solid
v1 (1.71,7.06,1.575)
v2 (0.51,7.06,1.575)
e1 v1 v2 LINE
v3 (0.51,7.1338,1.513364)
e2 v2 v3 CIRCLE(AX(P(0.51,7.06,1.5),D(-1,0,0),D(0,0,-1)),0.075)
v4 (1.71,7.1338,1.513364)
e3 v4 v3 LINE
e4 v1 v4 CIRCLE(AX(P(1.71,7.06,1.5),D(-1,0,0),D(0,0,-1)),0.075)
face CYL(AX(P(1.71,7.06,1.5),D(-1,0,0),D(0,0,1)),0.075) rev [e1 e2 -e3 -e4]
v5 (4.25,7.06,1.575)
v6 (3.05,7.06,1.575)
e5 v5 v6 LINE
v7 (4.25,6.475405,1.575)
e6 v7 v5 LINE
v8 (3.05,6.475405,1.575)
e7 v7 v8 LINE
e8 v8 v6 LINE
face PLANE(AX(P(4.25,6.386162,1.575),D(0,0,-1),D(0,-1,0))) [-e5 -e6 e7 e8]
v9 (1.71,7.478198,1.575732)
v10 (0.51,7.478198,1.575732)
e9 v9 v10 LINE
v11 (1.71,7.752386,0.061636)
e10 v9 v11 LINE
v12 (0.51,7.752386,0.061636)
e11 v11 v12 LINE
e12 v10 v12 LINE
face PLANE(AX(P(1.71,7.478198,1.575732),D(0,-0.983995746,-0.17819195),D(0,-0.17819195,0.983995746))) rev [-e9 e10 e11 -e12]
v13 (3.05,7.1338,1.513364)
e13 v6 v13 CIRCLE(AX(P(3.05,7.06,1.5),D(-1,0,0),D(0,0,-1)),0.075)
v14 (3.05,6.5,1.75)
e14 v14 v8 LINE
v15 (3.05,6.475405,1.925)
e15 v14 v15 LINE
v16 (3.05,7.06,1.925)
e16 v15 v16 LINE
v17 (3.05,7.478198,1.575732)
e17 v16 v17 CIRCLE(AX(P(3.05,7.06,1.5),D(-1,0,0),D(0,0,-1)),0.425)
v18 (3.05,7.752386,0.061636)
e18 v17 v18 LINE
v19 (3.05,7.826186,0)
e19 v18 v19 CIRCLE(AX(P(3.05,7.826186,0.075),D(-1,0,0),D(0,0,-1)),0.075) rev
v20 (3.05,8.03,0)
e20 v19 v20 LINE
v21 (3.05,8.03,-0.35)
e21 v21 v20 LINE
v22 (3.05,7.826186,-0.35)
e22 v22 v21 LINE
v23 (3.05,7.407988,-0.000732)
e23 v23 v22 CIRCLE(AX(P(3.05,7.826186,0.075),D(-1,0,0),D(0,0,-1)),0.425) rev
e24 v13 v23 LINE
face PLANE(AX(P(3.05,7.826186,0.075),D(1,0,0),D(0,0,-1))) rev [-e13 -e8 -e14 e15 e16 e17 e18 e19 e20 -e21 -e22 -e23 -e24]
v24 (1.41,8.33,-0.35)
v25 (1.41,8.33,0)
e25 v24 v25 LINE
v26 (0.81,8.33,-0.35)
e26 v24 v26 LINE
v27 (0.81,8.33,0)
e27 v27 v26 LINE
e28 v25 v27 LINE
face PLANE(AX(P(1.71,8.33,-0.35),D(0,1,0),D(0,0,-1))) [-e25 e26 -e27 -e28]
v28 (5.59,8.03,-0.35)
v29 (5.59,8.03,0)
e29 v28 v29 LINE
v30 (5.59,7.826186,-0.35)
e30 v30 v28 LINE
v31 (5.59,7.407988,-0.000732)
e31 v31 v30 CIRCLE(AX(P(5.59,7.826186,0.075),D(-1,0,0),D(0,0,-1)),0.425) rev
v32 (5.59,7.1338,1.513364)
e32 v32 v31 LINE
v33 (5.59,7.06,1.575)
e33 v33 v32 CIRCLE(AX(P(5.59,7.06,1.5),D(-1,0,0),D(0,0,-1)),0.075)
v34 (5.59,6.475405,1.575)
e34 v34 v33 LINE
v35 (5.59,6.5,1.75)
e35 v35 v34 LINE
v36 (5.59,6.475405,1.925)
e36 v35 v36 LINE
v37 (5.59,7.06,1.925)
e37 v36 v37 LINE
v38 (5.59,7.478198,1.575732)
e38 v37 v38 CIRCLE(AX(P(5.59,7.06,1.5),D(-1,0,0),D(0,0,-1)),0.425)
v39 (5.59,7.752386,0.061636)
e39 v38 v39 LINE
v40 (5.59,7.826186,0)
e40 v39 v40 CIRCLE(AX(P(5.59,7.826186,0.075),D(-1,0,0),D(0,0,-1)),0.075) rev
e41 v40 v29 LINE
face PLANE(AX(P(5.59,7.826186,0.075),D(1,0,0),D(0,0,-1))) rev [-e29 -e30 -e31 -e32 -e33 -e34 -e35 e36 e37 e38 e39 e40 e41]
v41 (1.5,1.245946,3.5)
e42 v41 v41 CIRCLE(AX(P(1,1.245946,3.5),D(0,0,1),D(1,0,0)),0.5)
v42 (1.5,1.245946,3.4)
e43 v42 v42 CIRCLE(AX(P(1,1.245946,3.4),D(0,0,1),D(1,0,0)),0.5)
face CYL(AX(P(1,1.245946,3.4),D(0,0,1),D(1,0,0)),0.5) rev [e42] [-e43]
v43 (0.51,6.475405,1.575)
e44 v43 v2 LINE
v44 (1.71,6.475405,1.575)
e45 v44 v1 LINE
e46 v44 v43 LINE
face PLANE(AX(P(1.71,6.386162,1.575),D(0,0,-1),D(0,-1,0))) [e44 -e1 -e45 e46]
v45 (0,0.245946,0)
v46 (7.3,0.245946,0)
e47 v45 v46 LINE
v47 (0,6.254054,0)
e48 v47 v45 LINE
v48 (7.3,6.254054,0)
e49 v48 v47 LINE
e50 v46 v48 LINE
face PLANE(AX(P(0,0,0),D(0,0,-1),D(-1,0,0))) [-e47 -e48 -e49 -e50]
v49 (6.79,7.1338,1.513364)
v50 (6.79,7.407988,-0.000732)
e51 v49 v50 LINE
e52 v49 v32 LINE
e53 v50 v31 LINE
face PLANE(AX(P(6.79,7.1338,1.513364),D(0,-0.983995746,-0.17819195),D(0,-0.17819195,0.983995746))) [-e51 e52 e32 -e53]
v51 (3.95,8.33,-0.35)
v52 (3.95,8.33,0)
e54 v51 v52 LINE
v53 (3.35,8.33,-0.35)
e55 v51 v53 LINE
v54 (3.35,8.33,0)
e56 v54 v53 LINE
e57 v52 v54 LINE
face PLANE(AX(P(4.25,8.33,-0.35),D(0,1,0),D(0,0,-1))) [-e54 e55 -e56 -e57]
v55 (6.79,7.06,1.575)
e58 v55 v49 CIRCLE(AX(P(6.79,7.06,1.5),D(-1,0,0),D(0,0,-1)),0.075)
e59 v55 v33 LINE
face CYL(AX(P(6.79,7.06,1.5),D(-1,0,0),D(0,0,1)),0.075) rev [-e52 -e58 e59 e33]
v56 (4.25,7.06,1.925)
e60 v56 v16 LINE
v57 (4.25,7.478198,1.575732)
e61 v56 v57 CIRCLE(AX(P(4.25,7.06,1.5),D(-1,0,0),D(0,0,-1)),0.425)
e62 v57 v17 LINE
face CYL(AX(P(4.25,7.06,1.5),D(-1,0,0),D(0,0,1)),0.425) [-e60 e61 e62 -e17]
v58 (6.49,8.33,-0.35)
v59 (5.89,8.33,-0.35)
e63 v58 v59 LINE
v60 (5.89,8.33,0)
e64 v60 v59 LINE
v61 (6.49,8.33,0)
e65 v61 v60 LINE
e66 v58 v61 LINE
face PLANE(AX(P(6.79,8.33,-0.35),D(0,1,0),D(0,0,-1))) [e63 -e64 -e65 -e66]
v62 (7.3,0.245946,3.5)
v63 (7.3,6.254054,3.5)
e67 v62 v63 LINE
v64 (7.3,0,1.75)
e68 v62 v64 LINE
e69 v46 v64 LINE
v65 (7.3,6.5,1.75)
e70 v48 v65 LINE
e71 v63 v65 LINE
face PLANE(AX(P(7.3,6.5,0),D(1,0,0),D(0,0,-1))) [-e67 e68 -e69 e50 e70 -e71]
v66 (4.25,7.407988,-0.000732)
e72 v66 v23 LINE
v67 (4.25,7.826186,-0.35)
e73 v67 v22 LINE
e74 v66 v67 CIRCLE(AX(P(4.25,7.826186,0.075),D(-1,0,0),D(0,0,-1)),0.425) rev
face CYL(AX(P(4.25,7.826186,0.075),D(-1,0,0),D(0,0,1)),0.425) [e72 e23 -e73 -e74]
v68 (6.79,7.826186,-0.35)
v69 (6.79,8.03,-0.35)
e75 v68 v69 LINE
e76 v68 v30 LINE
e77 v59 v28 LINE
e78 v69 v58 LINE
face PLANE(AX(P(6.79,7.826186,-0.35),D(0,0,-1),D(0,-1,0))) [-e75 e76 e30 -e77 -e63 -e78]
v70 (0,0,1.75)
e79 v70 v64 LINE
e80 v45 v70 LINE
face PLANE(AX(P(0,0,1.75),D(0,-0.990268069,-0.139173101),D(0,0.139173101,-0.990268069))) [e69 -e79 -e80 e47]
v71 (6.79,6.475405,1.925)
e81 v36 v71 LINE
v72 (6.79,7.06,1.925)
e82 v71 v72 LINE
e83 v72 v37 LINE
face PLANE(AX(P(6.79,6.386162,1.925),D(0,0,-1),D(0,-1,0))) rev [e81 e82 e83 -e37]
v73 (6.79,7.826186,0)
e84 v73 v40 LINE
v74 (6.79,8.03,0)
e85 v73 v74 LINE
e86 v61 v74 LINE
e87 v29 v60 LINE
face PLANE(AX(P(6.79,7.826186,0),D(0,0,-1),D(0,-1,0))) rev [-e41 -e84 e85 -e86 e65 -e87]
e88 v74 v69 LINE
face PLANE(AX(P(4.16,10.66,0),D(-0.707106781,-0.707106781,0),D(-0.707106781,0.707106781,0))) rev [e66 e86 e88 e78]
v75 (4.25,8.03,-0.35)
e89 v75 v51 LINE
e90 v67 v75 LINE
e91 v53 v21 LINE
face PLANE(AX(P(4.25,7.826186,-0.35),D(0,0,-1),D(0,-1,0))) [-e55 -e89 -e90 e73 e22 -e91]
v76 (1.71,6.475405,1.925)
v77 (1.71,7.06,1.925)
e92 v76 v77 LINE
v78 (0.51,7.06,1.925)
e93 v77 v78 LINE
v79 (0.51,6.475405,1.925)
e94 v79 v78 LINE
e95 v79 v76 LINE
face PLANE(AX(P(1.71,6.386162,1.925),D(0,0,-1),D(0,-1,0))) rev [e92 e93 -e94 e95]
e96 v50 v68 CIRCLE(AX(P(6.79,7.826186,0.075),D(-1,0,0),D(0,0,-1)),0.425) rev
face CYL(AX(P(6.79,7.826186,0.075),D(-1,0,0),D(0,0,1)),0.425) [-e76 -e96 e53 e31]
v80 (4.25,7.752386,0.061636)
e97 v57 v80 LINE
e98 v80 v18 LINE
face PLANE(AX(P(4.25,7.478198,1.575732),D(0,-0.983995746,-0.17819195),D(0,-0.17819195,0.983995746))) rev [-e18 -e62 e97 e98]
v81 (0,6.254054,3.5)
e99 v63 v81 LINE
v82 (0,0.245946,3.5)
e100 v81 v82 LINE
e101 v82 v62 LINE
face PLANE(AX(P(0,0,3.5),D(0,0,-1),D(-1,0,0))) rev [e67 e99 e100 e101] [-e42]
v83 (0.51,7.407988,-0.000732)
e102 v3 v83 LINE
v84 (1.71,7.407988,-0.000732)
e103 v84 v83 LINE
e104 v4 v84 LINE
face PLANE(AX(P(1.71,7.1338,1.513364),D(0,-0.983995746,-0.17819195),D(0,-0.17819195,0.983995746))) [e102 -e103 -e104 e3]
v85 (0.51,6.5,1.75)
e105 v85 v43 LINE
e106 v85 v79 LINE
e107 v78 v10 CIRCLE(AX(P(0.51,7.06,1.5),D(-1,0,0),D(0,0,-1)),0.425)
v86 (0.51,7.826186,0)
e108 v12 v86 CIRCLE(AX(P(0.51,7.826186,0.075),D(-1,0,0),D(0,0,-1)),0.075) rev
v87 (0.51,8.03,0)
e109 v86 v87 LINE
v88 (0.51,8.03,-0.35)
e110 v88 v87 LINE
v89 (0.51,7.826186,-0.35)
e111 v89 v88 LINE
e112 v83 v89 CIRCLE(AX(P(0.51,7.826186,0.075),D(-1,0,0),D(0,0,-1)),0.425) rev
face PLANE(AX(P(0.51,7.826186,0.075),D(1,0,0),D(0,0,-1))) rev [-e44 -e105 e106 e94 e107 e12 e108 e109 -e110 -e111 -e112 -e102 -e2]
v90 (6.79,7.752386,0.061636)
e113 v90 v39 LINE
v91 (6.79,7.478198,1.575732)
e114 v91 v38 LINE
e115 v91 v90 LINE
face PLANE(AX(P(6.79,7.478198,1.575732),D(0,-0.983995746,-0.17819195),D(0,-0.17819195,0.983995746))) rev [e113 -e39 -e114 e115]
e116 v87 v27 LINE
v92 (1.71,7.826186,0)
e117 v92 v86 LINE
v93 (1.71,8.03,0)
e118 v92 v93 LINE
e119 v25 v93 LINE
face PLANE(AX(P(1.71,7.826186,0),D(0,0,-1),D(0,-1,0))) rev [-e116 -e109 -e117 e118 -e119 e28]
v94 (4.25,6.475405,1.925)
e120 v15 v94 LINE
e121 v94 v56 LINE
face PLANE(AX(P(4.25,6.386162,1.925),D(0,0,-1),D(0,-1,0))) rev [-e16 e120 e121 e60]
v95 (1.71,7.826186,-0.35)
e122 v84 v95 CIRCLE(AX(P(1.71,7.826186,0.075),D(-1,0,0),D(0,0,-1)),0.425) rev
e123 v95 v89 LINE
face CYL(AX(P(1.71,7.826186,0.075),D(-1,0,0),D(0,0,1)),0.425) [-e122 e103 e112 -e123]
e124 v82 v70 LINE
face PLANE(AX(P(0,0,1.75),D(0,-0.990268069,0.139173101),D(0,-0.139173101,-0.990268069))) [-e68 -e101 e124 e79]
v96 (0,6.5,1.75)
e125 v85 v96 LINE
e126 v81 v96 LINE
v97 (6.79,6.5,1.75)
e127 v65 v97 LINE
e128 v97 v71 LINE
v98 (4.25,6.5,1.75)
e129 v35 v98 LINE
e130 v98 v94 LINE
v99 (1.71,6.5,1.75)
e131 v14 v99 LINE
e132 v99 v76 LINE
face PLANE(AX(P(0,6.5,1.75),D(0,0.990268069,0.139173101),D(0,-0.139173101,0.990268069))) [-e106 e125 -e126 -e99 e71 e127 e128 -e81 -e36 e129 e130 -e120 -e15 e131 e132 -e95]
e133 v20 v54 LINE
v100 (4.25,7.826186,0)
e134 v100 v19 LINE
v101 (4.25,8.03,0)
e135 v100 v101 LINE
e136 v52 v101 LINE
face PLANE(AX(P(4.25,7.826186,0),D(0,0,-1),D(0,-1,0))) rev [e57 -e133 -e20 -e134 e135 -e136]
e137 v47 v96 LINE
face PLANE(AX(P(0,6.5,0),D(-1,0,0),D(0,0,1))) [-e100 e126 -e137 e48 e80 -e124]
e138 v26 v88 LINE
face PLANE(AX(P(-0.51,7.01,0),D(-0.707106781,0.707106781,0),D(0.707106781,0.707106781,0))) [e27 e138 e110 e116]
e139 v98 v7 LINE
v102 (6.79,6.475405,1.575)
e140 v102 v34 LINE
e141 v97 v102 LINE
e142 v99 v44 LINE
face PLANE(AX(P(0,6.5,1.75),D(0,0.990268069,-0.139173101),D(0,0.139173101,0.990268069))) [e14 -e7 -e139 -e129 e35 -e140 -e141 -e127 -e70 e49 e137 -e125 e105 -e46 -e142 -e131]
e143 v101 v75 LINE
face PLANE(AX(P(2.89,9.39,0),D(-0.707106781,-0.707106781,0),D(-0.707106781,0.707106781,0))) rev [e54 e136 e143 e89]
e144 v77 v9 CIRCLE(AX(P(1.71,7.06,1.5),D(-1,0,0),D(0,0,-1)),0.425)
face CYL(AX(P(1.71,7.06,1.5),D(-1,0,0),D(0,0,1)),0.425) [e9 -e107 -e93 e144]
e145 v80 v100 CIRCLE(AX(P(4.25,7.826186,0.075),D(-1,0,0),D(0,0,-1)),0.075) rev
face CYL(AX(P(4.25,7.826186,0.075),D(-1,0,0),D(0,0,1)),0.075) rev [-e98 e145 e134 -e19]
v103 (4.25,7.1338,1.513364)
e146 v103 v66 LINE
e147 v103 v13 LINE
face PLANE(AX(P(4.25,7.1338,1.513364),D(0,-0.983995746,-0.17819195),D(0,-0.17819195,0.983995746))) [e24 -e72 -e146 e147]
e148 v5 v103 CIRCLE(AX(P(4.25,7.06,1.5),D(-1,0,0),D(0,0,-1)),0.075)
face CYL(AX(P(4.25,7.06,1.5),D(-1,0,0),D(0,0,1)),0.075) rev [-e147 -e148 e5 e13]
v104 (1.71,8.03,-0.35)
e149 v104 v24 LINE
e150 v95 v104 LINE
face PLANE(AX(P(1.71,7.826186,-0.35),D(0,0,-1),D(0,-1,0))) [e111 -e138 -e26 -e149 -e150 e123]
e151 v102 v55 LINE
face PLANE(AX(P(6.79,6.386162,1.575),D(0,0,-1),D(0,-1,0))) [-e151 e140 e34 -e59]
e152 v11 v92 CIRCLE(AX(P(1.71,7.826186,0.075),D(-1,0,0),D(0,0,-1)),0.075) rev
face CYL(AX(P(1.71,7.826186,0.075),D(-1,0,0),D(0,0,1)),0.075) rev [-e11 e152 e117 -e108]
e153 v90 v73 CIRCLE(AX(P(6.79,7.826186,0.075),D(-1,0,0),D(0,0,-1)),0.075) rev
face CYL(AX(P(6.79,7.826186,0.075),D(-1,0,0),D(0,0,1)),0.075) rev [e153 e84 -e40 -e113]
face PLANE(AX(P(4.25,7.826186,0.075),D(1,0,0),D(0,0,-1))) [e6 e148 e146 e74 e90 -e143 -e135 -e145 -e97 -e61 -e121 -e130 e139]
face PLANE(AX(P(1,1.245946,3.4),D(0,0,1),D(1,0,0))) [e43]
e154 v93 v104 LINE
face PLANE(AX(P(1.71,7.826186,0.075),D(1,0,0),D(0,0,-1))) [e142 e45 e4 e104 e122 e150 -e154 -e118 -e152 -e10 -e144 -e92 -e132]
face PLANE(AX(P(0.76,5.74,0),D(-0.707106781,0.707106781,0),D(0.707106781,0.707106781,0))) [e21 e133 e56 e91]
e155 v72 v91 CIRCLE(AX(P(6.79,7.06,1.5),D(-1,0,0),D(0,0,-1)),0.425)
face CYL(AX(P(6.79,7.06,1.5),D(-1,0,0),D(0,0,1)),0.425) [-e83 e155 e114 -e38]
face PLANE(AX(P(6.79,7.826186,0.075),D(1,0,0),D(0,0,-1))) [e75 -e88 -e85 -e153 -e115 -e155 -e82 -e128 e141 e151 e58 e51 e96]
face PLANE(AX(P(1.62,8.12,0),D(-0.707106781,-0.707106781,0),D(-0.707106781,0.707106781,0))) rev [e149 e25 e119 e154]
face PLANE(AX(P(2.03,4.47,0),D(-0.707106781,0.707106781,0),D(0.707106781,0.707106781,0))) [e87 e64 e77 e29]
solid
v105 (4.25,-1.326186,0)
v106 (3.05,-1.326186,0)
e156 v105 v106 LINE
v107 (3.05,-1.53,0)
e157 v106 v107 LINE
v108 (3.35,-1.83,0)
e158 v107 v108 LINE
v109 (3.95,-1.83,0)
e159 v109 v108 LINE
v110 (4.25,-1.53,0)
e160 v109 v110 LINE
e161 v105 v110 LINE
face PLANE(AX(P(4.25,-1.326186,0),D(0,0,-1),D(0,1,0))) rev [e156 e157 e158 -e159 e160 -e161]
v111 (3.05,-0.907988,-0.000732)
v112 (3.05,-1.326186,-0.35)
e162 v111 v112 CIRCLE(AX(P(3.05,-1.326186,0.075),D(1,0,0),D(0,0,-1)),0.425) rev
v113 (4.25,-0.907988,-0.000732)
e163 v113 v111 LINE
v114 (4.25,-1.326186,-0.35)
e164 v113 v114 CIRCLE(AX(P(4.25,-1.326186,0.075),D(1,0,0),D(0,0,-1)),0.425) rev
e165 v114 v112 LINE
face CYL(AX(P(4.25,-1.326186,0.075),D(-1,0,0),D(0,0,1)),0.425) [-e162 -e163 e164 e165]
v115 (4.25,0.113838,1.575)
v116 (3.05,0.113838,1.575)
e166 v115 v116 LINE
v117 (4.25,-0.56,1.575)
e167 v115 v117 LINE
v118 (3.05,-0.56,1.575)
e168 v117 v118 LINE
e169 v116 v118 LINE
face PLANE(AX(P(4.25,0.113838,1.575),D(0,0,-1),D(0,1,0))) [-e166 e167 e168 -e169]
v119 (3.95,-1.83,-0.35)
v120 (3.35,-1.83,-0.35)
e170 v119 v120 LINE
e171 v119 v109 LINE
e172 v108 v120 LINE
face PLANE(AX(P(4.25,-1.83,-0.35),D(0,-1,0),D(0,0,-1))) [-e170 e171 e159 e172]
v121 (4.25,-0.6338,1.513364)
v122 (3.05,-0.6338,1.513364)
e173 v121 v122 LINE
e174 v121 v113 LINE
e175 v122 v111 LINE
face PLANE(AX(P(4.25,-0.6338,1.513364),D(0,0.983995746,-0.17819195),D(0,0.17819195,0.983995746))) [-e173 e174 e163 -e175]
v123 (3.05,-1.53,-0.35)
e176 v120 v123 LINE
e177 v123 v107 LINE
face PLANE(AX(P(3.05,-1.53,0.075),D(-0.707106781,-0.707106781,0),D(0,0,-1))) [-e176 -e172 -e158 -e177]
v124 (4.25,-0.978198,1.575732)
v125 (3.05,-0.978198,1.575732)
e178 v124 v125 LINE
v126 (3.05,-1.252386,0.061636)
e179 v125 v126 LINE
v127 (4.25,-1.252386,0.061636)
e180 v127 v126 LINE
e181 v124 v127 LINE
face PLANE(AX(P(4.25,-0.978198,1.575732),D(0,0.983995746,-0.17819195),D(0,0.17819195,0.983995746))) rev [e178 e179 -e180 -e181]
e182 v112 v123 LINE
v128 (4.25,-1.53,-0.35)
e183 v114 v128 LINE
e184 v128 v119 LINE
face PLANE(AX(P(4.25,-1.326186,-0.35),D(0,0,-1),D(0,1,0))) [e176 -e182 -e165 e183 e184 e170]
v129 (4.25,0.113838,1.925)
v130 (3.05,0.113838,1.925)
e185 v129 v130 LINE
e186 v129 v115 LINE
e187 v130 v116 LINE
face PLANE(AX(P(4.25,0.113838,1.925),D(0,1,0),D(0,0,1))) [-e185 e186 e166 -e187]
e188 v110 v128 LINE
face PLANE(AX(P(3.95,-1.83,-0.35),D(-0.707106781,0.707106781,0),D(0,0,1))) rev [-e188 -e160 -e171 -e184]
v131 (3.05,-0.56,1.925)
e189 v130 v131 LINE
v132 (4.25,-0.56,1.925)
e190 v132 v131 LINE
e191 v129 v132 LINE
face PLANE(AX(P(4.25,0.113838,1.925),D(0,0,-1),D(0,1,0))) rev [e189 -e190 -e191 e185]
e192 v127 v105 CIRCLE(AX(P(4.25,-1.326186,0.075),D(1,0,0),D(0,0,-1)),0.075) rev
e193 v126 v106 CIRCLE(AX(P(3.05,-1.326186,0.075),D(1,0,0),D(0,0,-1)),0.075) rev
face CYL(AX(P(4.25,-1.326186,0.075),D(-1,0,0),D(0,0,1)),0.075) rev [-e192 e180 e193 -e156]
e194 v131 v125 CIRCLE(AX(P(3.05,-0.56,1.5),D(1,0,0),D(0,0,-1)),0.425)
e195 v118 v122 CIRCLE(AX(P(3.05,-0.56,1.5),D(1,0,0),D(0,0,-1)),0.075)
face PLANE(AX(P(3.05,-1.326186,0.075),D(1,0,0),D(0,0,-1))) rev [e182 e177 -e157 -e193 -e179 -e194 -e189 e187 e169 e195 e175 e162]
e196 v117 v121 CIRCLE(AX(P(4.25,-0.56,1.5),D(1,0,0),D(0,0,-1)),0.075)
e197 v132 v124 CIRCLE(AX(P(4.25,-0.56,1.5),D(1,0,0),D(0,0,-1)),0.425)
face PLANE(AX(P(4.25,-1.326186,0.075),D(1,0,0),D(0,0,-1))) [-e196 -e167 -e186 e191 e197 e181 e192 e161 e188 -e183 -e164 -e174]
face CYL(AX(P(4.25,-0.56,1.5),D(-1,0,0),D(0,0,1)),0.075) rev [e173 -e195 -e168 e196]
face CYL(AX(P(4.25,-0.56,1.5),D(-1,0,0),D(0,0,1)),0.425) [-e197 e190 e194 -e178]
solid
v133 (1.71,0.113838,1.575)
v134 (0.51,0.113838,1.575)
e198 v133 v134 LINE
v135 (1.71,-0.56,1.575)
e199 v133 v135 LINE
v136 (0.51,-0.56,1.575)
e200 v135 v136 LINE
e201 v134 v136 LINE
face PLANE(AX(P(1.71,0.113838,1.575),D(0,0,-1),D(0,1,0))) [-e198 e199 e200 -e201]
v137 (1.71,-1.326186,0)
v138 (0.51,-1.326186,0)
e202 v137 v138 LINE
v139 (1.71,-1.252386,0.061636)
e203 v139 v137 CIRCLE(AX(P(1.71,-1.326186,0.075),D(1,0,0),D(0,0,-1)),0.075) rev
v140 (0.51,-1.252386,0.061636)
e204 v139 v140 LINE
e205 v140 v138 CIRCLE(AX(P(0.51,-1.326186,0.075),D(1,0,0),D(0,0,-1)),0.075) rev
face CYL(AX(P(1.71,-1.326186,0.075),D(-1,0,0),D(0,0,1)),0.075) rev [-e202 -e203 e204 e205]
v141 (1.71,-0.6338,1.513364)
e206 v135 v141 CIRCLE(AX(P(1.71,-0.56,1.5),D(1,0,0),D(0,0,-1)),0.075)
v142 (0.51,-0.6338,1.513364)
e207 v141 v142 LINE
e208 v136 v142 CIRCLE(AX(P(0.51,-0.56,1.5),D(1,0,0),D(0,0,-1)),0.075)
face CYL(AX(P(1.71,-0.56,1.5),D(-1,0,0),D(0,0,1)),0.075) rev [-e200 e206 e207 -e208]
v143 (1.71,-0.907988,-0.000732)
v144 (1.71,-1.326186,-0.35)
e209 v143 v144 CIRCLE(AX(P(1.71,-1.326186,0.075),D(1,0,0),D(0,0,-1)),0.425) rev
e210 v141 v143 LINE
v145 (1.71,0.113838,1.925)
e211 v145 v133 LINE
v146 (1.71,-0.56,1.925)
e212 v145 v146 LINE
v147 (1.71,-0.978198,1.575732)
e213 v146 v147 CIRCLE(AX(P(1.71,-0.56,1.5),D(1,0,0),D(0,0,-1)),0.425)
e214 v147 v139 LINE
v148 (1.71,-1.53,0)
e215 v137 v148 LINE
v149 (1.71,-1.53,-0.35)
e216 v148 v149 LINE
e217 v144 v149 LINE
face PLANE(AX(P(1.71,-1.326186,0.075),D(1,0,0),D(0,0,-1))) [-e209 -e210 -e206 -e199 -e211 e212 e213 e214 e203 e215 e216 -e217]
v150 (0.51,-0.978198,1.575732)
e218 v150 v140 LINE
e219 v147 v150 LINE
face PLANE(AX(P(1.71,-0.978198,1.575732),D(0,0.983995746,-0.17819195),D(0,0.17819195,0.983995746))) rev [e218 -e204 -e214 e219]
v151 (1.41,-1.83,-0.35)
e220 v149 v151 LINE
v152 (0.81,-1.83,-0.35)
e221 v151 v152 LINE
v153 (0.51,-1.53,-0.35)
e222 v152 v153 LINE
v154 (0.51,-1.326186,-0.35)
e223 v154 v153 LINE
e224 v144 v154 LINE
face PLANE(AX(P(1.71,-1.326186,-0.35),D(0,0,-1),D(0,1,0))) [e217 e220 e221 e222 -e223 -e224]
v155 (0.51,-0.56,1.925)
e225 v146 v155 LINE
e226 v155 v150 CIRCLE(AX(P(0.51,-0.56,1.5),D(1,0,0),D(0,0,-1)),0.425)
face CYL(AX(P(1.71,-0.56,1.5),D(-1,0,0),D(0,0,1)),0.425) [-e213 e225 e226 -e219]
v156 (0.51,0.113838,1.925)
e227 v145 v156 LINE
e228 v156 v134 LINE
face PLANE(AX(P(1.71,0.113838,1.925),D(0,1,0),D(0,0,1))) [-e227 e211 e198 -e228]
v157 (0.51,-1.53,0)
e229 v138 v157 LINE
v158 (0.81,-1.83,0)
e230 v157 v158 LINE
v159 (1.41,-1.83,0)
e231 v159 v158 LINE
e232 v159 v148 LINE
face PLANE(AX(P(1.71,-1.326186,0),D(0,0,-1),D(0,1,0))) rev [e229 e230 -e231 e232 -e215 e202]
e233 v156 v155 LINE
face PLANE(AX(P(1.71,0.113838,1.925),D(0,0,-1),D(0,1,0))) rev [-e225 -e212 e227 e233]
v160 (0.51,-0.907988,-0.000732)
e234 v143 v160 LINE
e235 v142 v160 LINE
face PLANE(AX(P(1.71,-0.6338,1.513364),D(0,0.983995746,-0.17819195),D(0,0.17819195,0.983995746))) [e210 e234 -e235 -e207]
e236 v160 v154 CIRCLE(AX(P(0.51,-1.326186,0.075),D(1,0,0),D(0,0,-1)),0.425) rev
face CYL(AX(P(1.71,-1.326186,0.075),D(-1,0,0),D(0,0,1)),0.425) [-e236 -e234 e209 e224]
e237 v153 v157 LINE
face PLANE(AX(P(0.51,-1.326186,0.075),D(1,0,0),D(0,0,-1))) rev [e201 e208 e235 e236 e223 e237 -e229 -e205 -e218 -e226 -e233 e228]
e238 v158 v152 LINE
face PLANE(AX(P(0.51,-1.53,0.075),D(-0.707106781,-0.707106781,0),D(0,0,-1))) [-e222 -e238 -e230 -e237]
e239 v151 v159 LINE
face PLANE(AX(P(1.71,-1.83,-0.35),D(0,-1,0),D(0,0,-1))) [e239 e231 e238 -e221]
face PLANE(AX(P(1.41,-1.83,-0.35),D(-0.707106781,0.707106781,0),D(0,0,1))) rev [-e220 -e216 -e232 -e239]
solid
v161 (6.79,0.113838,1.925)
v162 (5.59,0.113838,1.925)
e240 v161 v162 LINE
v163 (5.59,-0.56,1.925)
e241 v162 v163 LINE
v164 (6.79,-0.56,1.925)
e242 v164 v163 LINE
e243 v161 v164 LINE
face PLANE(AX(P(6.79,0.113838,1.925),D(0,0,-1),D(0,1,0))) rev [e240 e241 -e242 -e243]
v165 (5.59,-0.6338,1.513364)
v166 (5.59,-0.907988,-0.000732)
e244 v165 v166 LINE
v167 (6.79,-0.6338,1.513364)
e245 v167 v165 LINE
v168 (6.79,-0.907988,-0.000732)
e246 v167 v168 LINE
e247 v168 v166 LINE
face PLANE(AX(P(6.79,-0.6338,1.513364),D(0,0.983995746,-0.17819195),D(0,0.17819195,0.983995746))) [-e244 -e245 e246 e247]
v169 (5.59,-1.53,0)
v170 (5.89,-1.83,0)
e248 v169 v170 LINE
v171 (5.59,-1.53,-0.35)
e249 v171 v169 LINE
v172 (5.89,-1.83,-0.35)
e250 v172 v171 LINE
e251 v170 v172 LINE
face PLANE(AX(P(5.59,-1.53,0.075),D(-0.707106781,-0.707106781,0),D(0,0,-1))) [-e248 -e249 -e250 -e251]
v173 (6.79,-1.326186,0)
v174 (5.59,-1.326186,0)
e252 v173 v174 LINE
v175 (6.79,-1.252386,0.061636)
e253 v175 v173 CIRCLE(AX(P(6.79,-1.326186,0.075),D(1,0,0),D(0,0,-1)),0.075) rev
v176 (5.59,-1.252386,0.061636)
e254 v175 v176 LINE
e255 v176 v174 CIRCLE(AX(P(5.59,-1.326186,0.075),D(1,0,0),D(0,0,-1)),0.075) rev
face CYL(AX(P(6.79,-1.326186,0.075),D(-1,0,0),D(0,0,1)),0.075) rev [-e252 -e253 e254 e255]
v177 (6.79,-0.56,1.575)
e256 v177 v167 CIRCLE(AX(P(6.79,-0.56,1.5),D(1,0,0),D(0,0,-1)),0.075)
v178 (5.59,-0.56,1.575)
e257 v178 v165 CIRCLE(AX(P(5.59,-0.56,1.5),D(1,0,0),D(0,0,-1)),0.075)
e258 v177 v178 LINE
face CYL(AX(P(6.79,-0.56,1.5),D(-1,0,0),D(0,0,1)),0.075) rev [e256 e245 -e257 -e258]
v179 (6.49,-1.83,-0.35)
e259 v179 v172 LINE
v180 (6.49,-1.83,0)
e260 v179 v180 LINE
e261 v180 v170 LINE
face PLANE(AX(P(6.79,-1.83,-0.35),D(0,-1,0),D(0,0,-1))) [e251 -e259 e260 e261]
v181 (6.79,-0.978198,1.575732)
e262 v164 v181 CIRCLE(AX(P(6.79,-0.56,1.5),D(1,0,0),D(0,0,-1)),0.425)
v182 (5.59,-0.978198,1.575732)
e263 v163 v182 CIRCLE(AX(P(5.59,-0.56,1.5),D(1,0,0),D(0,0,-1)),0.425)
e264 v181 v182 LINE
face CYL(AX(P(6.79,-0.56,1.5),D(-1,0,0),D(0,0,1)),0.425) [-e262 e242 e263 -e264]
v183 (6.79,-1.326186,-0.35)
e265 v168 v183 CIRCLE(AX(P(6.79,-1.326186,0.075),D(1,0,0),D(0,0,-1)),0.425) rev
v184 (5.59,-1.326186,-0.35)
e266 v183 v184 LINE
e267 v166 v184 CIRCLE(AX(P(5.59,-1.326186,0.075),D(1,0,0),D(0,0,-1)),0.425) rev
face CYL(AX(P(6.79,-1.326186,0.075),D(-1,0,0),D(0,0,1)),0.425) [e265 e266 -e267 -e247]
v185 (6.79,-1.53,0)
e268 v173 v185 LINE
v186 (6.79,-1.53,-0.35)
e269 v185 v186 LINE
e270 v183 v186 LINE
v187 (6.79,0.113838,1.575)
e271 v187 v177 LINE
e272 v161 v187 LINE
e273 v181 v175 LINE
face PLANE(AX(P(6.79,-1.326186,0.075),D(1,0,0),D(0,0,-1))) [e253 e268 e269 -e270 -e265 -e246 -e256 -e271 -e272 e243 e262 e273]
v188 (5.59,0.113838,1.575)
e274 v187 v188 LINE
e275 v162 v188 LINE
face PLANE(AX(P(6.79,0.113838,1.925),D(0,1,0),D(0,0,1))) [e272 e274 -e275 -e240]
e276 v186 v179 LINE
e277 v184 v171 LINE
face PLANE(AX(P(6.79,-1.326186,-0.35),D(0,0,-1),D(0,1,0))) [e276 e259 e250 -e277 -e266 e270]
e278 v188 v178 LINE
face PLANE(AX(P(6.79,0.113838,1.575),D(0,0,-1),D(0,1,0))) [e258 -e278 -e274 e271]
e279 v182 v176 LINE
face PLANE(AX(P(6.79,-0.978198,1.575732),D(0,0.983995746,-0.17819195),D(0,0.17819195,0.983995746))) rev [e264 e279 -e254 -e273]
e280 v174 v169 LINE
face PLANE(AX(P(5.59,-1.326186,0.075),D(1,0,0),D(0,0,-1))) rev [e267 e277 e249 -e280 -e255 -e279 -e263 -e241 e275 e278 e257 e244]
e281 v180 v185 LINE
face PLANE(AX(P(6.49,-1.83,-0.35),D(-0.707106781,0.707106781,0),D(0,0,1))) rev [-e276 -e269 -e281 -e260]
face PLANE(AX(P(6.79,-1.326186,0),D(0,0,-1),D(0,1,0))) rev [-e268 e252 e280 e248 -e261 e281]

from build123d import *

# Parameters (mm, degrees)
SKETCH1_W           = 7.3
SKETCH1_H           = 6.5
BOSS_EXTRUDE1_DEPTH = 1.75
SKETCH2_W           = 7.3
SKETCH2_H           = 6.5
BOSS_EXTRUDE2_DEPTH = 1.75
DRAFT1_ANGLE        = 8
DRAFT2_ANGLE        = -8
EXTRUDE_THIN2_DEPTH = 0.6
LPATTERN1_COUNT     = 3
LPATTERN1_PITCH     = 2.54
CHAMFER1_SIZE       = 0.3
CHAMFER2_SIZE       = 0.3
CHAMFER3_SIZE       = 0.3
MIRROR1_START       = 0.51
MIRROR1_DEPTH       = 1.2
MIRROR1_START_2     = 3.05
MIRROR1_2_DEPTH     = 1.2
MIRROR1_START_3     = 5.59
MIRROR1_3_DEPTH     = 1.2
MIRROR1_START_4     = -5.529575029
MIRROR1_4_OUTLINE_W = 7.887220049
MIRROR1_4_OUTLINE_H = 0.35
MIRROR1_4_DEPTH     = 0.212132034
MIRROR1_START_5     = -5.317442995
MIRROR1_5_OUTLINE_W = 1.796051224
MIRROR1_5_OUTLINE_H = 0.35
MIRROR1_5_DEPTH     = 1.796051225
MIRROR1_START_6     = -3.369650441
MIRROR1_6_OUTLINE_W = 1.796051224
MIRROR1_6_OUTLINE_H = 0.35
MIRROR1_6_DEPTH     = 1.644309895
MIRROR1_START_7     = -1.573599217
MIRROR1_7_OUTLINE_W = 1.520677503
MIRROR1_7_OUTLINE_H = 0.35
MIRROR1_7_DEPTH     = 0.84090524
SKETCH4_R           = 0.5
CUT_EXTRUDE1_DEPTH  = 0.1


with BuildPart() as part:
    # Sketch1 → Boss-Extrude1 (new body)
    with BuildSketch(Plane.XY.offset(1.75)):
        with Locations((3.65, 3.25)):
            Rectangle(SKETCH1_W, SKETCH1_H)
    extrude(amount=BOSS_EXTRUDE1_DEPTH)

    # Draft1
    draft1_faces = [part.faces().sort_by_distance(p)[0] for p in [
        (3.65, 6.5, 2.625),
        (3.65, 0, 2.625),
    ]]
    draft(draft1_faces, Plane.XY.offset(1.75), DRAFT1_ANGLE)



with BuildPart() as body_2:
    # Sketch2 → Boss-Extrude2 (new body)
    with BuildSketch(Plane.XY.offset(1.75)):
        with Locations((3.65, 3.25)):
            Rectangle(SKETCH2_W, SKETCH2_H)
    extrude(amount=-BOSS_EXTRUDE2_DEPTH)

    # Draft2
    draft2_faces = [body_2.faces().sort_by_distance(p)[0] for p in [
        (3.65, 6.5, 0.875),
        (3.65, 0, 0.875),
    ]]
    draft(draft2_faces, Plane.XY.offset(1.75), DRAFT2_ANGLE)


with BuildPart() as body_3:
    # Sketch3 → Extrude-Thin2 (new, symmetric)
    with BuildSketch(Plane(origin=(6.19, 0, 0), x_dir=(0, 0, -1), z_dir=(1, 0, 0))):
        with BuildLine():
            Line((-1.925, 0.113838246), (-1.925, -0.56))
            ThreePointArc((-1.925, -0.56), (-1.826198499, -0.832432633), (-1.575731579, -0.978198192))
            Line((-1.575731579, -0.978198192), (-0.061635604, -1.252386078))
            ThreePointArc((-0.061635604, -1.252386078), (-0.017435559, -1.278109412), (0, -1.326185759))
            Line((0, -1.326185759), (0, -1.83))
            Line((0, -1.83), (0.35, -1.83))
            Line((0.35, -1.83), (0.35, -1.326185759))
            ThreePointArc((0.35, -1.326185759), (0.251198499, -1.053753126), (0.000731579, -0.907987567))
            Line((0.000731579, -0.907987567), (-1.513364396, -0.633799681))
            ThreePointArc((-1.513364396, -0.633799681), (-1.557564441, -0.608076347), (-1.575, -0.56))
            Line((-1.575, -0.56), (-1.575, 0.113838246))
            Line((-1.575, 0.113838246), (-1.925, 0.113838246))
        make_face()
    extrude_thin2 = extrude(amount=EXTRUDE_THIN2_DEPTH, both=True)

    # Chamfer1
    chamfer1_edges = [body_3.edges().sort_by_distance(p)[0] for p in [
        (5.59, -1.83, -0.175),
        (6.79, -1.83, -0.175),
    ]]
    chamfer(chamfer1_edges, length=CHAMFER1_SIZE)


with BuildPart() as lpattern1_1:
    # LPattern1: pattern copy
    add(extrude_thin2.moved(Location(Vector(-1, 0, 0) * (1 * LPATTERN1_PITCH))))

    # Chamfer2
    chamfer2_edges = [lpattern1_1.edges().sort_by_distance(p)[0] for p in [
        (3.05, -1.83, -0.175),
        (4.25, -1.83, -0.175),
    ]]
    chamfer(chamfer2_edges, length=CHAMFER2_SIZE)


with BuildPart() as lpattern1_2:
    # LPattern1: pattern copy
    add(extrude_thin2.moved(Location(Vector(-1, 0, 0) * (2 * LPATTERN1_PITCH))))

    # Chamfer3
    chamfer3_edges = [lpattern1_2.edges().sort_by_distance(p)[0] for p in [
        (0.51, -1.83, -0.175),
        (1.71, -1.83, -0.175),
    ]]
    chamfer(chamfer3_edges, length=CHAMFER3_SIZE)


with BuildPart() as part_1:
    add(part.part)

    add(body_2.part)  # Mirror1 merges body 2
    # Mirror1: read off the stored shape, not the designer's step
    # Mirror1 outline → Mirror1 (add)
    with BuildSketch(Plane.YZ.offset(MIRROR1_START)):
        with BuildLine():
            Line((8.33, 0), (7.826185759, 0))
            ThreePointArc((7.826185759, 0), (7.778109412, 0.017435559), (7.752386078, 0.061635604))
            Line((7.752386078, 0.061635604), (7.478198192, 1.575731579))
            ThreePointArc((7.478198192, 1.575731579), (7.332432633, 1.826198499), (7.06, 1.925))
            Line((7.06, 1.925), (6.475405354, 1.925))
            Line((6.475405354, 1.925), (6.5, 1.75))
            Line((6.5, 1.75), (6.475405354, 1.575))
            Line((6.475405354, 1.575), (7.06, 1.575))
            ThreePointArc((7.06, 1.575), (7.108076347, 1.557564441), (7.133799681, 1.513364396))
            Line((7.133799681, 1.513364396), (7.407987567, -0.000731579))
            ThreePointArc((7.407987567, -0.000731579), (7.553753126, -0.251198499), (7.826185759, -0.35))
            Line((7.826185759, -0.35), (8.33, -0.35))
            Line((8.33, -0.35), (8.33, 0))
        make_face()
    extrude(amount=MIRROR1_DEPTH)

    # Mirror1 2 outline → Mirror1 2 (add)
    with BuildSketch(Plane.YZ.offset(MIRROR1_START_2)):
        with BuildLine():
            Line((8.33, 0), (7.826185759, 0))
            ThreePointArc((7.826185759, 0), (7.778109412, 0.017435559), (7.752386078, 0.061635604))
            Line((7.752386078, 0.061635604), (7.478198192, 1.575731579))
            ThreePointArc((7.478198192, 1.575731579), (7.332432633, 1.826198499), (7.06, 1.925))
            Line((7.06, 1.925), (6.475405354, 1.925))
            Line((6.475405354, 1.925), (6.5, 1.75))
            Line((6.5, 1.75), (6.475405354, 1.575))
            Line((6.475405354, 1.575), (7.06, 1.575))
            ThreePointArc((7.06, 1.575), (7.108076347, 1.557564441), (7.133799681, 1.513364396))
            Line((7.133799681, 1.513364396), (7.407987567, -0.000731579))
            ThreePointArc((7.407987567, -0.000731579), (7.553753126, -0.251198499), (7.826185759, -0.35))
            Line((7.826185759, -0.35), (8.33, -0.35))
            Line((8.33, -0.35), (8.33, 0))
        make_face()
    extrude(amount=MIRROR1_2_DEPTH)

    # Mirror1 3 outline → Mirror1 3 (add)
    with BuildSketch(Plane.YZ.offset(MIRROR1_START_3)):
        with BuildLine():
            Line((8.33, 0), (7.826185759, 0))
            ThreePointArc((7.826185759, 0), (7.778109412, 0.017435559), (7.752386078, 0.061635604))
            Line((7.752386078, 0.061635604), (7.478198192, 1.575731579))
            ThreePointArc((7.478198192, 1.575731579), (7.332432633, 1.826198499), (7.06, 1.925))
            Line((7.06, 1.925), (6.475405354, 1.925))
            Line((6.475405354, 1.925), (6.5, 1.75))
            Line((6.5, 1.75), (6.475405354, 1.575))
            Line((6.475405354, 1.575), (7.06, 1.575))
            ThreePointArc((7.06, 1.575), (7.108076347, 1.557564441), (7.133799681, 1.513364396))
            Line((7.133799681, 1.513364396), (7.407987567, -0.000731579))
            ThreePointArc((7.407987567, -0.000731579), (7.553753126, -0.251198499), (7.826185759, -0.35))
            Line((7.826185759, -0.35), (8.33, -0.35))
            Line((8.33, -0.35), (8.33, 0))
        make_face()
    extrude(amount=MIRROR1_3_DEPTH)

    # Mirror1 4 outline → Mirror1 4 (cut)
    with BuildSketch(Plane(origin=(0, 0, 0), x_dir=(0.7071067811865483, 0.7071067811865467, 0), z_dir=(0.7071067811865466, -0.7071067811865486, 0)).offset(MIRROR1_START_4)):
        with Locations((2.943610025, -0.175)):
            Rectangle(MIRROR1_4_OUTLINE_W, MIRROR1_4_OUTLINE_H)
    extrude(amount=MIRROR1_4_DEPTH, mode=Mode.SUBTRACT)

    # Mirror1 5 outline → Mirror1 5 (cut)
    with BuildSketch(Plane(origin=(0, 0, 0), x_dir=(0.7071067811865483, 0.7071067811865467, 0), z_dir=(0.7071067811865466, -0.7071067811865486, 0)).offset(MIRROR1_START_5)):
        with Locations((7.785245661, -0.175)):
            Rectangle(MIRROR1_5_OUTLINE_W, MIRROR1_5_OUTLINE_H)
    extrude(amount=MIRROR1_5_DEPTH, mode=Mode.SUBTRACT)

    # Mirror1 6 outline → Mirror1 6 (cut)
    with BuildSketch(Plane(origin=(0, 0, 0), x_dir=(0.7071067811865483, 0.7071067811865467, 0), z_dir=(0.7071067811865466, -0.7071067811865486, 0)).offset(MIRROR1_START_6)):
        with Locations((9.581296885, -0.175)):
            Rectangle(MIRROR1_6_OUTLINE_W, MIRROR1_6_OUTLINE_H)
    extrude(amount=MIRROR1_6_DEPTH, mode=Mode.SUBTRACT)

    # Mirror1 7 outline → Mirror1 7 (cut)
    with BuildSketch(Plane(origin=(0, 0, 0), x_dir=(0.7071067811865483, 0.7071067811865467, 0), z_dir=(0.7071067811865466, -0.7071067811865486, 0)).offset(MIRROR1_START_7)):
        with Locations((11.239661248, -0.175)):
            Rectangle(MIRROR1_7_OUTLINE_W, MIRROR1_7_OUTLINE_H)
    extrude(amount=MIRROR1_7_DEPTH, mode=Mode.SUBTRACT)

    # Sketch4 → Cut-Extrude1 (cut)
    with BuildSketch(Plane.XY.offset(3.5)):
        with Locations((1, 1.245946461)):
            Circle(SKETCH4_R)
    extrude(amount=-CUT_EXTRUDE1_DEPTH, mode=Mode.SUBTRACT)


solid = Compound([body_3.part, lpattern1_1.part, lpattern1_2.part, part_1.part])
